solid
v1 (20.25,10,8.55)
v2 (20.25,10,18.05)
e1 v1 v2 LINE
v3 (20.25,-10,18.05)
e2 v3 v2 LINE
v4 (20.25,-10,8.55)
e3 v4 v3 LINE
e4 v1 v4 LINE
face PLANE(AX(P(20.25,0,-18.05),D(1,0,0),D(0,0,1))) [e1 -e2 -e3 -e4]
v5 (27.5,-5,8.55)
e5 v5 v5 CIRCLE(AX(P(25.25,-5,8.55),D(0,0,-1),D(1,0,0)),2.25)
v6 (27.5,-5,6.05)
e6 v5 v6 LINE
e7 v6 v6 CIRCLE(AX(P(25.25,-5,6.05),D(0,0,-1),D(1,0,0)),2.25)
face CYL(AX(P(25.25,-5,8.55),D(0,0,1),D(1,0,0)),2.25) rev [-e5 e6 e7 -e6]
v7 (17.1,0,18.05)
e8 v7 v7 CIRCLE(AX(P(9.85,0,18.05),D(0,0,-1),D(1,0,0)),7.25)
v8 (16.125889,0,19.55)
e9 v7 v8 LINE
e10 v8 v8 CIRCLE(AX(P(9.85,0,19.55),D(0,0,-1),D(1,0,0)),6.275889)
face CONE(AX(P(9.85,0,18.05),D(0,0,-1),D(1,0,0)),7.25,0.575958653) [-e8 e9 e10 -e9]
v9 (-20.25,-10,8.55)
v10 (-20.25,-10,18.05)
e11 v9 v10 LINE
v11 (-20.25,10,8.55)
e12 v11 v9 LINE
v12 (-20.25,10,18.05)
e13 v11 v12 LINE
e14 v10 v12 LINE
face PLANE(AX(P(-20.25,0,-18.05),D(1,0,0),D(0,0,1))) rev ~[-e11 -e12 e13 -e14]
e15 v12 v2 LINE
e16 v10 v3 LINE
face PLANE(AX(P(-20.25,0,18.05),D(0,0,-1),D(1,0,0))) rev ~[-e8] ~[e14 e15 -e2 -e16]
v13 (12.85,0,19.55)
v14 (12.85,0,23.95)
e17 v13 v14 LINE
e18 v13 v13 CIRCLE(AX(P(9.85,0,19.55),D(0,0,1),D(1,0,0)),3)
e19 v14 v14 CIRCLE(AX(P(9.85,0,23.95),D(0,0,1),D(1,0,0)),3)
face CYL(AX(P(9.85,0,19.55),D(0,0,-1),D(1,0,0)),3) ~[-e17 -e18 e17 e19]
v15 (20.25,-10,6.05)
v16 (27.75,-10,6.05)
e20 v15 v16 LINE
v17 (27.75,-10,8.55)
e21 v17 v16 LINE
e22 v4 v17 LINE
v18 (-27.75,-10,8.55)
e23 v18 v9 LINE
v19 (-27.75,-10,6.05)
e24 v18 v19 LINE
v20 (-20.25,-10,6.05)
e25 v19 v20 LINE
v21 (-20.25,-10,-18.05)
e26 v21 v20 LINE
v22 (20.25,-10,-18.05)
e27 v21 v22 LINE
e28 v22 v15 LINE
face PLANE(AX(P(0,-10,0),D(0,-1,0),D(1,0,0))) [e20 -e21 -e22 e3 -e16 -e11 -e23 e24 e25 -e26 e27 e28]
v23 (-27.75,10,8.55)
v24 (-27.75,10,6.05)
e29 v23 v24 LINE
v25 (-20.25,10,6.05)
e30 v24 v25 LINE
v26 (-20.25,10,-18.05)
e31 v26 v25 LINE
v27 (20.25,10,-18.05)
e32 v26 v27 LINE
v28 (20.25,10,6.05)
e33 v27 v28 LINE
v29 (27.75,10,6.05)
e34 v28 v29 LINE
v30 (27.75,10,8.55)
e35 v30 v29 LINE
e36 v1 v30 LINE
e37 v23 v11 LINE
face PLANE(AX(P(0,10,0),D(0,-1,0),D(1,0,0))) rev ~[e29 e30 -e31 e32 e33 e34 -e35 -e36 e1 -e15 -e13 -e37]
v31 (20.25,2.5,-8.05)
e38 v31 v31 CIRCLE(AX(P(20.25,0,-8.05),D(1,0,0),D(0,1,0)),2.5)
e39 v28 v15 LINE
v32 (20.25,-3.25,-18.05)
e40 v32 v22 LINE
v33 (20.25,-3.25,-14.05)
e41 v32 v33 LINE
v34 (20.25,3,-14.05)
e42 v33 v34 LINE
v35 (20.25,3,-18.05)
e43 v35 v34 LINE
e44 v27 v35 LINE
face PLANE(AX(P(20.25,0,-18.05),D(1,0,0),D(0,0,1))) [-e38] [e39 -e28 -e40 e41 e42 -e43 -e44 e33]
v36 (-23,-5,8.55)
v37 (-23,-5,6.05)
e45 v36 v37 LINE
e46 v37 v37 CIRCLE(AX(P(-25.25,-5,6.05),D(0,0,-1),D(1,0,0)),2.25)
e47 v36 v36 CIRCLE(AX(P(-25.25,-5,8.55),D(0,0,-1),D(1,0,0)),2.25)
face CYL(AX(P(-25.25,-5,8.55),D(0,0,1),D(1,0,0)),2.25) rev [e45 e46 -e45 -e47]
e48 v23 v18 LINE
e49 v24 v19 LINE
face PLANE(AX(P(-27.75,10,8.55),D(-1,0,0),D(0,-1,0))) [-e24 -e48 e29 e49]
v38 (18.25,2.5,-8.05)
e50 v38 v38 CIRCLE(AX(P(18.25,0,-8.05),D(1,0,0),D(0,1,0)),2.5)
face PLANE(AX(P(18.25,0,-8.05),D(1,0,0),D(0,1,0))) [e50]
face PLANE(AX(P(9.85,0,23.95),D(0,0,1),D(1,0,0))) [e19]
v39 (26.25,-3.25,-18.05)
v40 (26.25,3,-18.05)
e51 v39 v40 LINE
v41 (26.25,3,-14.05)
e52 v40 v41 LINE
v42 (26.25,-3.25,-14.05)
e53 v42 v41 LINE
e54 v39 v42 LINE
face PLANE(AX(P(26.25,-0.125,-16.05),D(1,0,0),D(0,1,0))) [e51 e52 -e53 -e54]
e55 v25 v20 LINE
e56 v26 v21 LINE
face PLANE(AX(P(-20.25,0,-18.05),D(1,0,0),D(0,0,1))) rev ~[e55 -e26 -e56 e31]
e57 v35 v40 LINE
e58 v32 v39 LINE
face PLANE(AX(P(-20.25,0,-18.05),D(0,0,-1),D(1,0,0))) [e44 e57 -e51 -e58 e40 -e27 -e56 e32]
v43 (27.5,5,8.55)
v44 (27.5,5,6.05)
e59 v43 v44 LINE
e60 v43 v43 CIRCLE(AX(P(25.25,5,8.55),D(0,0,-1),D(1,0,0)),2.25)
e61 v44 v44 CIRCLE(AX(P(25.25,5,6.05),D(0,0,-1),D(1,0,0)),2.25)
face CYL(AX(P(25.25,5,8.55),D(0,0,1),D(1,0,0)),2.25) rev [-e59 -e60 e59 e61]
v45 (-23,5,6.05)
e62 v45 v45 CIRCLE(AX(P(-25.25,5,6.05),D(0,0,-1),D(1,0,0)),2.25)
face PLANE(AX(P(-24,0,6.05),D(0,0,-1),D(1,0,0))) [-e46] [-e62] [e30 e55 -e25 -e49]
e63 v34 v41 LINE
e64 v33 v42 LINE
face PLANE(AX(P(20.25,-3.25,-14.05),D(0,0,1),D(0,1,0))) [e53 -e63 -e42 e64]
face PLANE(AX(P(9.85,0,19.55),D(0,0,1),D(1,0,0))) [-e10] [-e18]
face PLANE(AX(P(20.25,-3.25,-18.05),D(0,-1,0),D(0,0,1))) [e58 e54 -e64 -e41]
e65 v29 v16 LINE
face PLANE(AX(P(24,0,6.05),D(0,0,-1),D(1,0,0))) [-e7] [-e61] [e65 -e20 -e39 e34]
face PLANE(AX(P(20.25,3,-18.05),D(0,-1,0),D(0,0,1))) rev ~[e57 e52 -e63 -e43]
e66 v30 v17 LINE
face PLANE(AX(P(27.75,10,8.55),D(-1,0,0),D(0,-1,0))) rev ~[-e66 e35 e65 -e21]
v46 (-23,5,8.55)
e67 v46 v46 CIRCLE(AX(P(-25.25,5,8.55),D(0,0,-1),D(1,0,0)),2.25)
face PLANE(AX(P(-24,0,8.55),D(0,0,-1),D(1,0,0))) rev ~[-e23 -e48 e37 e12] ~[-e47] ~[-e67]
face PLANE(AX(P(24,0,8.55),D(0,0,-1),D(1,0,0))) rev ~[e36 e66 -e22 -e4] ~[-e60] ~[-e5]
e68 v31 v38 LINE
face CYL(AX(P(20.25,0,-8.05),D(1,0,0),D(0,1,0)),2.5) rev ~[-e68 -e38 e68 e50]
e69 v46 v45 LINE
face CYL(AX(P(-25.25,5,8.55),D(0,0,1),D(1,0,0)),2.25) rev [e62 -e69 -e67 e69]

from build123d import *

# Parameters (mm, degrees)
F0_W      = 40.5
F0_H      = 36.1
F1_DEPTH  = 10
F3_W      = 7.5
F3_H      = 20
F3_R      = 2.25
F4_DEPTH  = 2.5
F5_R      = 7.25
F6_DEPTH  = 1.5
F6_TAPER  = 33
F8_R      = 3
F9_DEPTH  = 4.4
F10_R     = 2.5
F11_DEPTH = 2
F12_W     = 6.25
F12_H     = 4
F13_DEPTH = 6


# Not quite as in the source:
# - a feature names something its author has since deleted; it is built from what else it names


with BuildPart() as f1:
    # F0 (on Front) → F1 (new body, symmetric)
    with BuildSketch(Plane.XZ):
        Rectangle(F0_W, F0_H)
    extrude(amount=F1_DEPTH, both=True)

    # F3 (on offset) → F4 (join)
    with BuildSketch(Plane(origin=(0, 0, 8.55), x_dir=(1, 0, 0), z_dir=(0, 0, -1))):
        with Locations((-24, 0)):
            Rectangle(F3_W, F3_H)
        with Locations((-25.25, -5)):
            Circle(F3_R, mode=Mode.SUBTRACT)
        with Locations((-25.25, 5)):
            Circle(F3_R, mode=Mode.SUBTRACT)
        with Locations((24, 0)):
            Rectangle(F3_W, F3_H)
        with Locations((25.25, -5)):
            Circle(F3_R, mode=Mode.SUBTRACT)
        with Locations((25.25, 5)):
            Circle(F3_R, mode=Mode.SUBTRACT)
    extrude(amount=F4_DEPTH)

    # F5 (on face) → F6 (join)
    with BuildSketch(Plane.XY.offset(18.05)):
        with Locations((9.85, 0)):
            Circle(F5_R)
    extrude(amount=F6_DEPTH, taper=F6_TAPER)

    # F8 (on face) → F9 (join, through all)
    with BuildSketch(Plane.XY.offset(19.55)):
        with Locations((9.85, 0)):
            Circle(F8_R)
    extrude(amount=F9_DEPTH)

    # F10 (on face) → F11 (cut)
    with BuildSketch(Plane.YZ.offset(20.25)):
        with Locations((0, -8.05)):
            Circle(F10_R)
    extrude(amount=-F11_DEPTH, mode=Mode.SUBTRACT)

    # F12 (on face) → F13 (join)
    with BuildSketch(Plane.YZ.offset(20.25)):
        with Locations((-0.125, -16.05)):
            Rectangle(F12_W, F12_H)
    extrude(amount=F13_DEPTH)


solid = f1.part
